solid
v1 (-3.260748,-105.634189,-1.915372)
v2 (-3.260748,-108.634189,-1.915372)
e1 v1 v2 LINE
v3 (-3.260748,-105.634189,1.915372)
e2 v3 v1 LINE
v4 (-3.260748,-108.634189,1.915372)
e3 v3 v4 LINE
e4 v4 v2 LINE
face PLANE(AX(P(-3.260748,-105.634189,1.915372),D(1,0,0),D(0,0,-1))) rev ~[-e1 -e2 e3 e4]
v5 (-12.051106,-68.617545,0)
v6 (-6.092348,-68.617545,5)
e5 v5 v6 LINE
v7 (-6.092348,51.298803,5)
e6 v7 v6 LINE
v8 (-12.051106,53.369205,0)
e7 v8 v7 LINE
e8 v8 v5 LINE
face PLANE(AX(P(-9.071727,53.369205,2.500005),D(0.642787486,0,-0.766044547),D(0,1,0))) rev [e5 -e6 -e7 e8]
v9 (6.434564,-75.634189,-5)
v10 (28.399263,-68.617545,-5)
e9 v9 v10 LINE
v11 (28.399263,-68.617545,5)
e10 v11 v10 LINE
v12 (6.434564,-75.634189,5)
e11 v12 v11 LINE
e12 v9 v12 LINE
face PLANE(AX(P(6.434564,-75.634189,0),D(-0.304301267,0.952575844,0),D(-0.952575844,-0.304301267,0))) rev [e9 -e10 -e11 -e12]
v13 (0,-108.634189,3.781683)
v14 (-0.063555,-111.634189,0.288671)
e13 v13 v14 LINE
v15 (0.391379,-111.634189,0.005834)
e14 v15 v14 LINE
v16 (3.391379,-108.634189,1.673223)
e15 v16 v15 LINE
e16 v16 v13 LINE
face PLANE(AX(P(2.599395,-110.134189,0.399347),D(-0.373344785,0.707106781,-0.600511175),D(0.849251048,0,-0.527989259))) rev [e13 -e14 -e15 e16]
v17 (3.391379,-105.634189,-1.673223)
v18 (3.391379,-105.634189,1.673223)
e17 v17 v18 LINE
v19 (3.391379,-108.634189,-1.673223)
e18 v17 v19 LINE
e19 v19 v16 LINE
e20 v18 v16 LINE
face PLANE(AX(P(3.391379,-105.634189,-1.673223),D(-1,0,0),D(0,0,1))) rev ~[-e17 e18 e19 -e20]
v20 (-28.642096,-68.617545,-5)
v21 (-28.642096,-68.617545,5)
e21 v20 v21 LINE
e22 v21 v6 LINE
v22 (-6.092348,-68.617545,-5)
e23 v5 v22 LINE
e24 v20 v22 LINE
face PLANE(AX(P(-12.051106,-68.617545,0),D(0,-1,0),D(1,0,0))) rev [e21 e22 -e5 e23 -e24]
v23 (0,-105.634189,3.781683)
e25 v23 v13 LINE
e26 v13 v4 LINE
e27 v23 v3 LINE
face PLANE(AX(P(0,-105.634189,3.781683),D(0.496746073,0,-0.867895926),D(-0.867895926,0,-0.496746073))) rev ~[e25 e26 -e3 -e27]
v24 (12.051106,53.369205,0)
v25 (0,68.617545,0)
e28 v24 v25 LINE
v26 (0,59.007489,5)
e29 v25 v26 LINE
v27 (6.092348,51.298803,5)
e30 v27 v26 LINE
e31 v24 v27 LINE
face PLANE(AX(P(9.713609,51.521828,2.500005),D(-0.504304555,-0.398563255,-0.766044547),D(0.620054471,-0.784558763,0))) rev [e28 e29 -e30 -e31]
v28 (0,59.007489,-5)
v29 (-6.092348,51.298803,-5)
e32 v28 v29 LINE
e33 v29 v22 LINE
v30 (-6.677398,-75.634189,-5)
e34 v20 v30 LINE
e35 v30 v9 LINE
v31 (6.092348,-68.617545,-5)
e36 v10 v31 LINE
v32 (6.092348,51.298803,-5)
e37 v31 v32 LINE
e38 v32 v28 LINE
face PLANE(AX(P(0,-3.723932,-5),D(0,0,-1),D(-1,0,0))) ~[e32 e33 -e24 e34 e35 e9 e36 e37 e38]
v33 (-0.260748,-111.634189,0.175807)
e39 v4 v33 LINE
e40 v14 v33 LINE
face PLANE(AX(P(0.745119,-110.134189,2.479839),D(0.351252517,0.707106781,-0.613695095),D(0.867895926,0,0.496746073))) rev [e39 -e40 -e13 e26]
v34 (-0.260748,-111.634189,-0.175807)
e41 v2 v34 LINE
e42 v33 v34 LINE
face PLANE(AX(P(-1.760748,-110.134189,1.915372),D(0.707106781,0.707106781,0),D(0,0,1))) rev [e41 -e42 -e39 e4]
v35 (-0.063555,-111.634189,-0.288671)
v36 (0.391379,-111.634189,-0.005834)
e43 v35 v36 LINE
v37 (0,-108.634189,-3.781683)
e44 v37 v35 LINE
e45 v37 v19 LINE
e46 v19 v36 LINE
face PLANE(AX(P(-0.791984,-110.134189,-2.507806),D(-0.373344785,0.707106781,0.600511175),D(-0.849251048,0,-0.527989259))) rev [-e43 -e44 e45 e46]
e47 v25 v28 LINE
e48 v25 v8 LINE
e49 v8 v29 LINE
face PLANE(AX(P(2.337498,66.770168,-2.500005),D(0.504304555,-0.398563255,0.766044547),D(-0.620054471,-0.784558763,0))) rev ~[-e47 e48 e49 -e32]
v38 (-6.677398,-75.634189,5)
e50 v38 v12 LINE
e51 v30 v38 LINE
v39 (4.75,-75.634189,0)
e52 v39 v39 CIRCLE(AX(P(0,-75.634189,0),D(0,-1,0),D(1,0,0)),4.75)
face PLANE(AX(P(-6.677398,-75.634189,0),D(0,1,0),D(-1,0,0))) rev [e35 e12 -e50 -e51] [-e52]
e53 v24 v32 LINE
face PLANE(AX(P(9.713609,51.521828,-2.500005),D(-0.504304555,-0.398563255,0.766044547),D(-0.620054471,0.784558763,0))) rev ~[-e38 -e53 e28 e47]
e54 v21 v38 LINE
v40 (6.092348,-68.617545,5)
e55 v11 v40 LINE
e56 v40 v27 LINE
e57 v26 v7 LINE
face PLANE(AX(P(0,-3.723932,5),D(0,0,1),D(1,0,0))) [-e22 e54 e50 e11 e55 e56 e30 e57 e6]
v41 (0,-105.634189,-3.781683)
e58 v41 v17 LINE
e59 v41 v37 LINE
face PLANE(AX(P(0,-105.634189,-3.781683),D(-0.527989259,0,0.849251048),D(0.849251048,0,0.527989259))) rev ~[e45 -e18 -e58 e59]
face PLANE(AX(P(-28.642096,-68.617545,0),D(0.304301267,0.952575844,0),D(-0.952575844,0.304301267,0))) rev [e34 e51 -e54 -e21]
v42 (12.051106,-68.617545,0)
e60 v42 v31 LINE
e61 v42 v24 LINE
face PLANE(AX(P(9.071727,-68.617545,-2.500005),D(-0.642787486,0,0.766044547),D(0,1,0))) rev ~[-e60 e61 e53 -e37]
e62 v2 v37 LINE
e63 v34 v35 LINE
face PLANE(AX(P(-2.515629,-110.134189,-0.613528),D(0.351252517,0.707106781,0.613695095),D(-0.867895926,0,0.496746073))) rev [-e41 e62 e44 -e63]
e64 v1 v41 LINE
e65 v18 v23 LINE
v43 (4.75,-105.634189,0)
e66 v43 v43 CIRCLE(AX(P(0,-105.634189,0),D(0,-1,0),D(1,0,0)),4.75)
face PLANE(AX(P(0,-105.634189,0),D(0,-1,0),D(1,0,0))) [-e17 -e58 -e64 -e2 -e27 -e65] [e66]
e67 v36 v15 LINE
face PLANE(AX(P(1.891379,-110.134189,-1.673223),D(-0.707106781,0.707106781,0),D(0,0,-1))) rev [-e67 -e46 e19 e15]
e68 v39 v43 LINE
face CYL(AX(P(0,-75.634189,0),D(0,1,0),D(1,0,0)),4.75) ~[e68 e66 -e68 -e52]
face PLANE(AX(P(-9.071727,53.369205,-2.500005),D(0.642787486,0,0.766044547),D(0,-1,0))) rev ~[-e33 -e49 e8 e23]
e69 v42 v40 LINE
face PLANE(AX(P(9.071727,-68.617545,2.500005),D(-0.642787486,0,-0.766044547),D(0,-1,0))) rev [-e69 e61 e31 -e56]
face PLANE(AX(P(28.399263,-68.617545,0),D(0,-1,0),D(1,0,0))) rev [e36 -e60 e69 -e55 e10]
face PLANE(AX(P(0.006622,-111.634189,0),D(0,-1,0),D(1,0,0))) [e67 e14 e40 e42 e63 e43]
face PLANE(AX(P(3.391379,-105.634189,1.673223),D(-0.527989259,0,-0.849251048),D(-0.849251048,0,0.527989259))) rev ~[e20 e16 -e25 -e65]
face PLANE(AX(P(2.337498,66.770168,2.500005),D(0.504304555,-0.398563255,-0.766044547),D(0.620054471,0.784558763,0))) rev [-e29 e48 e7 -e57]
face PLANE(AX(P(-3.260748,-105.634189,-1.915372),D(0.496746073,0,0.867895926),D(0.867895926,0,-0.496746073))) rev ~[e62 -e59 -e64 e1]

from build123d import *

# Parameters (mm, degrees)
F1_DEPTH = 5
F2_SIZE2 = 5.958758
F2_SIZE  = 4.99999
F4_R     = 4.75
F5_DEPTH = 30
F7_DEPTH = 6
F8_SIZE2 = 3
F8_SIZE  = 3


# Not quite as in the source:
# - a fillet or chamfer is up to 0.001 mm smaller than in the source, because OpenCascade refuses the exact size


with BuildPart() as f1:
    # F0 (on Top) → F1 (new body)
    with BuildSketch(Plane.XY):
        Polygon((-12.0511064306, 53.3692054451), (-12.0511064306, -68.6175450683), (12.0511064306, -68.6175450683), (12.0511064306, 53.3692054451), (0, 68.6175450683), align=None)
        Polygon((12.0511064306, -68.6175450683), (-12.0511064306, -68.6175450683), (-28.6420956254, -68.6175450683), (-6.6773975268, -75.6341889501), (6.4345644787, -75.6341889501), (28.3992625773, -68.6175450683), align=None)
    extrude(amount=F1_DEPTH)

    # F2 (size 5 and 5.958767963 in the source; OpenCascade refuses exactly that, so slightly less here)
    f2_edges = [f1.edges().sort_by_distance(p)[0] for p in [
        (12.051106, -7.62417, 5),
        (6.025553, 60.993375, 5),
        (-6.025553, 60.993375, 5),
        (-12.051106, -7.62417, 5),
    ]]
    chamfer(f2_edges, length=F2_SIZE, length2=F2_SIZE2)

    # F3: F1 across plane


with BuildPart() as f1_1:
    add(f1.part)
    add(f1.part.mirror(Plane.XY))

    # F4 (on face) → F5 (join)
    with BuildSketch(Plane.XZ.offset(75.6341889501)):
        Circle(F4_R)
    extrude(amount=F5_DEPTH)

    # F6 (on face) → F7 (join)
    with BuildSketch(Plane.XZ.offset(105.6341889501)):
        Polygon((3.3913787161, 1.6732233375), (0, 3.7816829499), (-3.2607477523, 1.9153720341), (-3.2607477523, -1.9153720341), (0, -3.7816829499), (3.3913787161, -1.6732233375), align=None)
    extrude(amount=F7_DEPTH)

    # F8
    f8_edges = [f1_1.edges().sort_by_distance(p)[0] for p in [
        (-1.630374, -111.634189, 2.848527),
        (1.695689, -111.634189, 2.727453),
        (-3.260748, -111.634189, 0),
        (-1.630374, -111.634189, -2.848527),
        (1.695689, -111.634189, -2.727453),
        (3.391379, -111.634189, 0),
    ]]
    chamfer(f8_edges, length=F8_SIZE, length2=F8_SIZE2)


solid = f1_1.part
